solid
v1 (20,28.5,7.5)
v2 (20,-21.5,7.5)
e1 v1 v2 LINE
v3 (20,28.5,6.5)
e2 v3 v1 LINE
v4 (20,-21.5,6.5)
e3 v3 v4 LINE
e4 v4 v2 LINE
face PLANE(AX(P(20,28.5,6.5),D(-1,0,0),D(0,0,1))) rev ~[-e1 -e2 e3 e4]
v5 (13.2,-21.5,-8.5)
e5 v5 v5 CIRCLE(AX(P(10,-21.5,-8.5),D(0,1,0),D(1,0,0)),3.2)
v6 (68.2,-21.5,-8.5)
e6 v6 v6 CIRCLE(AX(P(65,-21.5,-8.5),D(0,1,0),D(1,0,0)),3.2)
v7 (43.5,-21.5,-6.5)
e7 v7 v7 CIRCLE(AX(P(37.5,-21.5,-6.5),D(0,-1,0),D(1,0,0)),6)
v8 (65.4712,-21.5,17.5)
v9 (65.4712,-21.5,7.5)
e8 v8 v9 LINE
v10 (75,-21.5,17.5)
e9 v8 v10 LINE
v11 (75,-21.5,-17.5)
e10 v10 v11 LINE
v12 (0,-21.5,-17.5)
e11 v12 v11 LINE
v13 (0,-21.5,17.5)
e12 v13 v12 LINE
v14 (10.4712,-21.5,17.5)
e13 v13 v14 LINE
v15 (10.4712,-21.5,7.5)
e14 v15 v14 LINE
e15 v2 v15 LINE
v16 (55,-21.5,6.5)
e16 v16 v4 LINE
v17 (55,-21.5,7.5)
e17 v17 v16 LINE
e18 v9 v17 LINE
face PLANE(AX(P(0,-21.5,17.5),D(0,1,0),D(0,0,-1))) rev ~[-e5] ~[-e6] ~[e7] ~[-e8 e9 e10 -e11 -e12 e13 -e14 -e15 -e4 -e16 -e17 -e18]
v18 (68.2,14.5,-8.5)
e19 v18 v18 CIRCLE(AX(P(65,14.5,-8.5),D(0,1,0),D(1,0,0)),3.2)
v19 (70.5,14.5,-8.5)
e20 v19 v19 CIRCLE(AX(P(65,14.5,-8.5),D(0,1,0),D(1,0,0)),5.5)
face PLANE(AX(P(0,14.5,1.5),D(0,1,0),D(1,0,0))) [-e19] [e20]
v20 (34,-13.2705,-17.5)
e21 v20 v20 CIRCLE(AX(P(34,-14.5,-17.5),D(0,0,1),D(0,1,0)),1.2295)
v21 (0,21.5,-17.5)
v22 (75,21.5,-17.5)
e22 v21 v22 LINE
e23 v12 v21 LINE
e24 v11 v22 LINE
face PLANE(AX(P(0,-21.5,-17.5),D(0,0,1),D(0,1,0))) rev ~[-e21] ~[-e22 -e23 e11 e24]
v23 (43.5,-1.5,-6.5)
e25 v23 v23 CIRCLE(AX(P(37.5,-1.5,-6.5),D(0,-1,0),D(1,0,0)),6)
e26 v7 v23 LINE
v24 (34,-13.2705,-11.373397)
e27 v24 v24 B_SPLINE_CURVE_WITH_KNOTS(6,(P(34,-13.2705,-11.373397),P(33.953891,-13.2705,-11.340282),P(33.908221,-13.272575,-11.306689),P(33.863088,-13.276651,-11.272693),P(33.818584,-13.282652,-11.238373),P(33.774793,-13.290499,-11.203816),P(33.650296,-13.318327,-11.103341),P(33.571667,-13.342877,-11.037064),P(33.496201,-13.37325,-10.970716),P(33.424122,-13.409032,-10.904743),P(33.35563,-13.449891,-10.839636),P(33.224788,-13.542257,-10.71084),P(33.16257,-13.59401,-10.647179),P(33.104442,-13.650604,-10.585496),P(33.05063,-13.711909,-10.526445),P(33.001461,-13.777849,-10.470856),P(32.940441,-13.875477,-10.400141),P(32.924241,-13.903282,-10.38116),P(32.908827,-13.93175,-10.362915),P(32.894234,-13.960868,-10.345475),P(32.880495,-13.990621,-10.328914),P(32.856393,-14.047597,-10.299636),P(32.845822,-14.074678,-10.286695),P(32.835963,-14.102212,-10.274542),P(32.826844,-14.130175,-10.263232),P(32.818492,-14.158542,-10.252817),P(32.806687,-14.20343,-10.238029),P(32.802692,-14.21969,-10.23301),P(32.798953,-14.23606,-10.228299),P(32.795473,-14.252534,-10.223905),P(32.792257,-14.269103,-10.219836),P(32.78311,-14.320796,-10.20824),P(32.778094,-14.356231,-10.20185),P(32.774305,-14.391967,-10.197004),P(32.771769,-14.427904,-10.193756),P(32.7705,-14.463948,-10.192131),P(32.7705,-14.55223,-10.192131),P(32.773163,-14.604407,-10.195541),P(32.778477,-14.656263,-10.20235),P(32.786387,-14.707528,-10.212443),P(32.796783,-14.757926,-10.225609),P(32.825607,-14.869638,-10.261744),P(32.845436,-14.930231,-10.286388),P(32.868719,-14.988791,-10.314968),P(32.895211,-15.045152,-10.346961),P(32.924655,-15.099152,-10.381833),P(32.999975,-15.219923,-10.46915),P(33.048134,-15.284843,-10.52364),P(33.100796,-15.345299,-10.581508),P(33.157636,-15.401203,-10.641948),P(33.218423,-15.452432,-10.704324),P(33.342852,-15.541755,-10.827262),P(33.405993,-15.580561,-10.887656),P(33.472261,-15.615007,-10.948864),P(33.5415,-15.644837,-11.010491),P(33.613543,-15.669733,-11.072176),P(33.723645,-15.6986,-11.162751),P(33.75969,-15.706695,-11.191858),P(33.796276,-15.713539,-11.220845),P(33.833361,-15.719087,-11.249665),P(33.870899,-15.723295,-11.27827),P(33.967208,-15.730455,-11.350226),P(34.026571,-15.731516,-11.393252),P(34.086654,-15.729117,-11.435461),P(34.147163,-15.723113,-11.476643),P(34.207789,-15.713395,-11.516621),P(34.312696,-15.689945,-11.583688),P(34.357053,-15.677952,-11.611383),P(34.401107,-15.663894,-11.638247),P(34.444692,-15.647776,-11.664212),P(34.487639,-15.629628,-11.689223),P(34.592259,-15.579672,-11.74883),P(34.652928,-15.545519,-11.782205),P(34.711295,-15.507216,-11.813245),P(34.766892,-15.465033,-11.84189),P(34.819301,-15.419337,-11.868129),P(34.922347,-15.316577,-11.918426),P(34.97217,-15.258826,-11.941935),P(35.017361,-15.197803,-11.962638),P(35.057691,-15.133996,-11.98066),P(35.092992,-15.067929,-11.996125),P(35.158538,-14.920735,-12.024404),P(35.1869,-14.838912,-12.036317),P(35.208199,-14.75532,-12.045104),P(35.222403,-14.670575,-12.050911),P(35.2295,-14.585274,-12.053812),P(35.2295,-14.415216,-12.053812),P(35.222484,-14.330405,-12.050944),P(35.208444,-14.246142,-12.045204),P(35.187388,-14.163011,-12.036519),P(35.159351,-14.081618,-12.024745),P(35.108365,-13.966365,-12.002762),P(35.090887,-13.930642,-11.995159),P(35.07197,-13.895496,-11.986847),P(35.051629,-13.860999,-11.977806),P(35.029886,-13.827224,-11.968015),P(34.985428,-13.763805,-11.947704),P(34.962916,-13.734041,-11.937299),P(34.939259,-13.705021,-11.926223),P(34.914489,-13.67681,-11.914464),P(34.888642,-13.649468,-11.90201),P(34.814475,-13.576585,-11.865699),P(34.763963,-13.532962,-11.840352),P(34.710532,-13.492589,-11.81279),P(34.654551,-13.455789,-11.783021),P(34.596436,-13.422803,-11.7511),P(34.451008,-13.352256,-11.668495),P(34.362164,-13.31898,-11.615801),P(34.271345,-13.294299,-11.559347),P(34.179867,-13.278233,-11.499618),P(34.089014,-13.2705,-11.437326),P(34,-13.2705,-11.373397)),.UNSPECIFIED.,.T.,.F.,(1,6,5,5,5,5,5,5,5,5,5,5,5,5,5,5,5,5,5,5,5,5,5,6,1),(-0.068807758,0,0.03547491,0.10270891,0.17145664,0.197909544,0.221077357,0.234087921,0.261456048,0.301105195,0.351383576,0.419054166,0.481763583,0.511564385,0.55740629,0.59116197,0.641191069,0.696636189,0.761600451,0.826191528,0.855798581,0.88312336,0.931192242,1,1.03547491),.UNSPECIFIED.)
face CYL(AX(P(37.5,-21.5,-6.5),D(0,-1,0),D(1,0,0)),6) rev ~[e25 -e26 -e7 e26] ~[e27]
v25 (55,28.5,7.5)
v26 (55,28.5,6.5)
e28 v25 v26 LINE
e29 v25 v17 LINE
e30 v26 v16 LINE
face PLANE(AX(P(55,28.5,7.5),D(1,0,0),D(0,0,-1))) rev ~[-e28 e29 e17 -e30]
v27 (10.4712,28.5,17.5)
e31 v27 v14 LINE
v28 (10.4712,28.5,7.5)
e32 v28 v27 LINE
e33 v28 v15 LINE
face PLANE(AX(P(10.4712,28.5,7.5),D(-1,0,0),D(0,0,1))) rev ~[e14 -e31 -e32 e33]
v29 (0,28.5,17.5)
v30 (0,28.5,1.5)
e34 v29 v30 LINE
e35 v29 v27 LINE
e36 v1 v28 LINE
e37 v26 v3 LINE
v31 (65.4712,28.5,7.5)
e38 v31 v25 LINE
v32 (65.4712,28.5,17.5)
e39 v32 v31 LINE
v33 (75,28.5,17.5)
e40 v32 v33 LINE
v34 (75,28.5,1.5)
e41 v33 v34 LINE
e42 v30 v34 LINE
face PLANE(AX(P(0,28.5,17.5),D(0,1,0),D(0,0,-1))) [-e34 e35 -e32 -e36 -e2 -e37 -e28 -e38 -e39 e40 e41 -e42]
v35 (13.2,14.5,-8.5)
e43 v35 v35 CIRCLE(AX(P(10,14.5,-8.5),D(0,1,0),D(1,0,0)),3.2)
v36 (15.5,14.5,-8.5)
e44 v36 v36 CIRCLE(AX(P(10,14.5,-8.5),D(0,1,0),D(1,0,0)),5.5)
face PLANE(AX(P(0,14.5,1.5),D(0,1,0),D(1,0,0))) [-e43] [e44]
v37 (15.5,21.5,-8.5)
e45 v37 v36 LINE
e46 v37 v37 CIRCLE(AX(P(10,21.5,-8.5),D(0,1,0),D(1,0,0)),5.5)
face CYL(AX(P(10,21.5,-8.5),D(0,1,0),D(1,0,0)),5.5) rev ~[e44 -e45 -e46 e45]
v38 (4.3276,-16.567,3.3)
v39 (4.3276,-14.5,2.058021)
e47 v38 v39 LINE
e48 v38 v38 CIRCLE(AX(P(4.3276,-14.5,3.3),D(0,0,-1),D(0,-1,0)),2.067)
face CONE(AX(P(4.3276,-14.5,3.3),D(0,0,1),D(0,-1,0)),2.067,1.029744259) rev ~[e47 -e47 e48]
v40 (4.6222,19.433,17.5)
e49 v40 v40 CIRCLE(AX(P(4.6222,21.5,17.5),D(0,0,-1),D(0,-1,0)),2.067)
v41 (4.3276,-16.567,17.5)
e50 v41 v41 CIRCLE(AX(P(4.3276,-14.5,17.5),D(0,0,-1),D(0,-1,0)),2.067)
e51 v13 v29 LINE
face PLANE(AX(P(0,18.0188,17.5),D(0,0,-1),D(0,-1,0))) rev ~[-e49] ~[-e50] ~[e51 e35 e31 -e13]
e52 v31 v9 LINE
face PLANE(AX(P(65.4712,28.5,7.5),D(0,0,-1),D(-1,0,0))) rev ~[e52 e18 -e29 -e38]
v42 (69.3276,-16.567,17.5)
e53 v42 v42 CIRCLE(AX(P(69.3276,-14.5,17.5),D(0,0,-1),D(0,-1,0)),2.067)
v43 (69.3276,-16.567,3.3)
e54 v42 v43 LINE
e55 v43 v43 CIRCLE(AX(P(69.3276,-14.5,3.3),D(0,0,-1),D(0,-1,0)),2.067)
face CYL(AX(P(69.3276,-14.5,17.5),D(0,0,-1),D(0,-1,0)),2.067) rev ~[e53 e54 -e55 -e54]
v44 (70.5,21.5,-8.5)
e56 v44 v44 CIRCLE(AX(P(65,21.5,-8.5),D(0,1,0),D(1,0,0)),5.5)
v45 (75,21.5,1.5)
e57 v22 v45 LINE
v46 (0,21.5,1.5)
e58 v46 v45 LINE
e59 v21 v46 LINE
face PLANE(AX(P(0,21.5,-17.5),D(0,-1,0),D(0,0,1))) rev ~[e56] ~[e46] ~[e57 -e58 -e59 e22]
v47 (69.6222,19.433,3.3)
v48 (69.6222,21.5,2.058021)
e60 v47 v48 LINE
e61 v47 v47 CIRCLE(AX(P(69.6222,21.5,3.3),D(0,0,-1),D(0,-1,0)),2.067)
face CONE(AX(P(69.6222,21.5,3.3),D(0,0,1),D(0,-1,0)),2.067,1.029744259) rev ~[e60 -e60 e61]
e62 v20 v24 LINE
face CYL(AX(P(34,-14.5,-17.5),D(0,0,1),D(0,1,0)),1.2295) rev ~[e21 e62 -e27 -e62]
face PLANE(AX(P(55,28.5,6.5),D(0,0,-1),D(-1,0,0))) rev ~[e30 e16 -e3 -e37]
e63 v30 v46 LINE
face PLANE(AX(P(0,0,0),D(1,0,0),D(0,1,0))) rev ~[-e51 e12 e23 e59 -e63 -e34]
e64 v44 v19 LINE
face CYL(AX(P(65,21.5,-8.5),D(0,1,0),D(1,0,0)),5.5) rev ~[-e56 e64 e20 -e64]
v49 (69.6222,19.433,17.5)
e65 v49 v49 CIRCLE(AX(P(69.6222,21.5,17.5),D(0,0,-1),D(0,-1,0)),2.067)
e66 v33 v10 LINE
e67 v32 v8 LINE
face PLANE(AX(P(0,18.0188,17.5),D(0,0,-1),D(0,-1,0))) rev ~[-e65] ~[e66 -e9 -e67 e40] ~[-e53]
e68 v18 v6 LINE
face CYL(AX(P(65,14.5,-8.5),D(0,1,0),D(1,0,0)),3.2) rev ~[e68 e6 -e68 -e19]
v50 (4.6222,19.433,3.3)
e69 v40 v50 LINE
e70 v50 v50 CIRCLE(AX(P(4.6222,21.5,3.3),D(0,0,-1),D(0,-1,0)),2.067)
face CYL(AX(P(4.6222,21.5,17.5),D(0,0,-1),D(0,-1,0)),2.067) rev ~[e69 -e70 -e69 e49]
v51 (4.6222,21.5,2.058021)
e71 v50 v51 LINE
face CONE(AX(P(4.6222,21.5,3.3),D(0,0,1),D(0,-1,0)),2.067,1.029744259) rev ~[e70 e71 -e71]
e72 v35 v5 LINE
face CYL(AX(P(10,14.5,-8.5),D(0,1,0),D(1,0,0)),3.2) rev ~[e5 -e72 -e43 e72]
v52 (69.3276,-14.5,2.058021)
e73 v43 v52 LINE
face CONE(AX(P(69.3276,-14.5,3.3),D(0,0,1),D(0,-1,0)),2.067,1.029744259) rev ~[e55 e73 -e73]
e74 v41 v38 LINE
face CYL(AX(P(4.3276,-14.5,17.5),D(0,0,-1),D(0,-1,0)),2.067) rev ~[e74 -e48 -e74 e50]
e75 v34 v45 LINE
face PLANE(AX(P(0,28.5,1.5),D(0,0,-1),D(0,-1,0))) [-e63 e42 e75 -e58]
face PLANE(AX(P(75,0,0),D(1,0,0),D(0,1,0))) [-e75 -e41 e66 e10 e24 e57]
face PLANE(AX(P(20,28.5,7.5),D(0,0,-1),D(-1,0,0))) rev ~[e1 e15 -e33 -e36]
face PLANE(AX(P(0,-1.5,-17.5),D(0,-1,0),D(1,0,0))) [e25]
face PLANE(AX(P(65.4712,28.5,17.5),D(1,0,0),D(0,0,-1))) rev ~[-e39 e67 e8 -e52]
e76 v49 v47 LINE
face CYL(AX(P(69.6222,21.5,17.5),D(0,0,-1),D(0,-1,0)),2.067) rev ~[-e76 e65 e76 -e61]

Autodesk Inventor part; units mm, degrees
ref_plane "YZ Plane" through (0, 0, 0) normal (1, 0, 0) x (0, 1, 0)
ref_plane "XZ Plane" through (0, 0, 0) normal (0, 1, 0) x (-1, 0, 0)
ref_plane "XY Plane" through (0, 0, 0) normal (0, 0, 1) x (1, 0, 0)
sketch "Sketch1" plane through (0, 0, 0) normal (1, 0, 0) x (0, 1, 0)
  line L0 (-21.5, -17.5) -> (21.5, -17.5)
  line L1 (21.5, -17.5) -> (21.5, 1.5)
  line L2 (21.5, 17.5) -> (-21.5, 17.5)
  line L3 (-21.5, 17.5) -> (-21.5, -17.5)
  line L4 (-21.5, -17.5) -> (21.5, 17.5) construction
  line L5 (21.5, -17.5) -> (-21.5, 17.5) construction
  line L6 (18.0188, 17.5) -> (28.5, 17.5)
  line L7 (28.5, 17.5) -> (28.5, 1.5)
  line L8 (28.5, 1.5) -> (21.5, 1.5)
  point P0 (0, 0)
  dimension "d0" = 43
  dimension "d1" = 35
  dimension "d2" = 50
  dimension "d3" = 16
extrude "Extrusion1" add sketch "Sketch1" along normal blind 75
sketch "Sketch2" plane through (0, 28.5, 17.5) normal (0, 1, 0) x (1, 0, 0)
  line L0 (0, 0) -> (75, 0) projected
  line L1 (65.4712, 0) -> (65.4712, 10)
  line L2 (65.4712, 10) -> (55, 10)
  line L3 (55, 10) -> (55, 11)
  line L4 (55, 11) -> (20, 11)
  line L5 (20, 11) -> (20, 10)
  line L6 (20, 10) -> (10.4712, 10)
  line L7 (10.4712, 10) -> (10.4712, 0)
  line L8 (0, 35) -> (75, 35) projected
  line L9 (37.5, 35) -> (37.5, 5.3668)
  point P0 (0, 17.5)
  dimension "d6" = 55
  dimension "d7" = 35
  dimension "d8" = 17.5
  dimension "d9" = 11
  dimension "d10" = 10
extrude "Extrusion2" cut sketch "Sketch2" against normal blind 75
sketch "Sketch3" plane through (0, 21.5, 1.5) normal (0, 1, 0) x (1, 0, 0)
  circle A0 centre (10, 10) radius 5.5
  circle A1 centre (65, 10) radius 5.5
  line L0 (0, 19) -> (75, 19) projected
  line L1 (75, 19) -> (75, 0) projected
  line L2 (0, -16) -> (10.4712, -16) projected
  line L3 (65.4712, -16) -> (75, -16) projected
  point P0 (0, 1.5)
  dimension "d13" = 11
  dimension "d14" = 11
  dimension "d15" = 55
  dimension "d19" = 26
  dimension "d20" = 26
extrude "Extrusion3" cut sketch "Sketch3" against normal blind 7
sketch "Sketch4" plane through (65, 14.5, -8.5) normal (0, 1, 0) x (1, 0, 0)
  circle A0 centre (0, 0) radius 5.5 projected
  circle A1 centre (0, 0) radius 3.2
  circle A2 centre (-55, 0) radius 5.5 projected
  circle A3 centre (-55, 0) radius 3.2
  point P0 (-65, -8.5)
  dimension "d23" = 6.4
  dimension "d24" = 6.4
extrude "Extrusion4" cut sketch "Sketch4" against normal blind 40 contours A1 | A3
sketch "Sketch7" plane through (0, -21.5, 17.5) normal (0, 0, 1) x (1, 0, 0)
  line L0 (0, 0) -> (10.4712, 0) projected
  line L1 (0, 50) -> (10.4712, 50) projected
  point P0 (0, 21.5)
  point P1 (4.3276, 7)
  point P2 (4.6222, 43)
  point P3 (5.2356, 0)
  dimension "d31" = 7
  dimension "d32" = 36
  dimension "d33" = 7
hole "Hole1" at (4.3276, -14.5, 17.5) at (4.6222, 21.5, 17.5) direction (0, 0, -1) diameter 4.134 depth 14.2 tip angle 118 thread size "M5x0.8" class "6H" standard "ISO Metric profile"
pattern_linear "Rectangular Pattern1" count 2 spacing 65 along (1, 0, 0) of "Hole1"
sketch "Sketch9" plane through (0, -21.5, -17.5) normal (0, -1, 0) x (1, 0, 0)
  circle A0 centre (37.5, 11) radius 6
  line L0 (0, 35) -> (0, 0) projected
  line L1 (0, 35) -> (10.4712, 35) projected
  point P0 (0, 17.5)
  dimension "d53" = 37.5
  dimension "d54" = 24
  dimension "d55" = 12
extrude "Extrusion6" cut sketch "Sketch9" against normal blind 20
sketch "Sketch10" plane through (0, -21.5, -17.5) normal (0, 0, -1) x (-1, 0, 0)
  line L0 (0, 0) -> (0, 43) projected
  line L1 (0, 0) -> (-75, 0) projected
  line L2 (-75, 0) -> (-75, 43) projected
  point P0 (0, 21.5)
  point P1 (-34, 7)
  dimension "d59" = 7
  dimension "d60" = 41
hole "Hole3" at (34, -14.5, -17.5) direction (0, 0, 1) diameter 2.459 depth 8.8 tip angle 118 thread size "M3x0.5" class "6H" standard "ISO Metric profile"
properties part number "Lose Backe"
